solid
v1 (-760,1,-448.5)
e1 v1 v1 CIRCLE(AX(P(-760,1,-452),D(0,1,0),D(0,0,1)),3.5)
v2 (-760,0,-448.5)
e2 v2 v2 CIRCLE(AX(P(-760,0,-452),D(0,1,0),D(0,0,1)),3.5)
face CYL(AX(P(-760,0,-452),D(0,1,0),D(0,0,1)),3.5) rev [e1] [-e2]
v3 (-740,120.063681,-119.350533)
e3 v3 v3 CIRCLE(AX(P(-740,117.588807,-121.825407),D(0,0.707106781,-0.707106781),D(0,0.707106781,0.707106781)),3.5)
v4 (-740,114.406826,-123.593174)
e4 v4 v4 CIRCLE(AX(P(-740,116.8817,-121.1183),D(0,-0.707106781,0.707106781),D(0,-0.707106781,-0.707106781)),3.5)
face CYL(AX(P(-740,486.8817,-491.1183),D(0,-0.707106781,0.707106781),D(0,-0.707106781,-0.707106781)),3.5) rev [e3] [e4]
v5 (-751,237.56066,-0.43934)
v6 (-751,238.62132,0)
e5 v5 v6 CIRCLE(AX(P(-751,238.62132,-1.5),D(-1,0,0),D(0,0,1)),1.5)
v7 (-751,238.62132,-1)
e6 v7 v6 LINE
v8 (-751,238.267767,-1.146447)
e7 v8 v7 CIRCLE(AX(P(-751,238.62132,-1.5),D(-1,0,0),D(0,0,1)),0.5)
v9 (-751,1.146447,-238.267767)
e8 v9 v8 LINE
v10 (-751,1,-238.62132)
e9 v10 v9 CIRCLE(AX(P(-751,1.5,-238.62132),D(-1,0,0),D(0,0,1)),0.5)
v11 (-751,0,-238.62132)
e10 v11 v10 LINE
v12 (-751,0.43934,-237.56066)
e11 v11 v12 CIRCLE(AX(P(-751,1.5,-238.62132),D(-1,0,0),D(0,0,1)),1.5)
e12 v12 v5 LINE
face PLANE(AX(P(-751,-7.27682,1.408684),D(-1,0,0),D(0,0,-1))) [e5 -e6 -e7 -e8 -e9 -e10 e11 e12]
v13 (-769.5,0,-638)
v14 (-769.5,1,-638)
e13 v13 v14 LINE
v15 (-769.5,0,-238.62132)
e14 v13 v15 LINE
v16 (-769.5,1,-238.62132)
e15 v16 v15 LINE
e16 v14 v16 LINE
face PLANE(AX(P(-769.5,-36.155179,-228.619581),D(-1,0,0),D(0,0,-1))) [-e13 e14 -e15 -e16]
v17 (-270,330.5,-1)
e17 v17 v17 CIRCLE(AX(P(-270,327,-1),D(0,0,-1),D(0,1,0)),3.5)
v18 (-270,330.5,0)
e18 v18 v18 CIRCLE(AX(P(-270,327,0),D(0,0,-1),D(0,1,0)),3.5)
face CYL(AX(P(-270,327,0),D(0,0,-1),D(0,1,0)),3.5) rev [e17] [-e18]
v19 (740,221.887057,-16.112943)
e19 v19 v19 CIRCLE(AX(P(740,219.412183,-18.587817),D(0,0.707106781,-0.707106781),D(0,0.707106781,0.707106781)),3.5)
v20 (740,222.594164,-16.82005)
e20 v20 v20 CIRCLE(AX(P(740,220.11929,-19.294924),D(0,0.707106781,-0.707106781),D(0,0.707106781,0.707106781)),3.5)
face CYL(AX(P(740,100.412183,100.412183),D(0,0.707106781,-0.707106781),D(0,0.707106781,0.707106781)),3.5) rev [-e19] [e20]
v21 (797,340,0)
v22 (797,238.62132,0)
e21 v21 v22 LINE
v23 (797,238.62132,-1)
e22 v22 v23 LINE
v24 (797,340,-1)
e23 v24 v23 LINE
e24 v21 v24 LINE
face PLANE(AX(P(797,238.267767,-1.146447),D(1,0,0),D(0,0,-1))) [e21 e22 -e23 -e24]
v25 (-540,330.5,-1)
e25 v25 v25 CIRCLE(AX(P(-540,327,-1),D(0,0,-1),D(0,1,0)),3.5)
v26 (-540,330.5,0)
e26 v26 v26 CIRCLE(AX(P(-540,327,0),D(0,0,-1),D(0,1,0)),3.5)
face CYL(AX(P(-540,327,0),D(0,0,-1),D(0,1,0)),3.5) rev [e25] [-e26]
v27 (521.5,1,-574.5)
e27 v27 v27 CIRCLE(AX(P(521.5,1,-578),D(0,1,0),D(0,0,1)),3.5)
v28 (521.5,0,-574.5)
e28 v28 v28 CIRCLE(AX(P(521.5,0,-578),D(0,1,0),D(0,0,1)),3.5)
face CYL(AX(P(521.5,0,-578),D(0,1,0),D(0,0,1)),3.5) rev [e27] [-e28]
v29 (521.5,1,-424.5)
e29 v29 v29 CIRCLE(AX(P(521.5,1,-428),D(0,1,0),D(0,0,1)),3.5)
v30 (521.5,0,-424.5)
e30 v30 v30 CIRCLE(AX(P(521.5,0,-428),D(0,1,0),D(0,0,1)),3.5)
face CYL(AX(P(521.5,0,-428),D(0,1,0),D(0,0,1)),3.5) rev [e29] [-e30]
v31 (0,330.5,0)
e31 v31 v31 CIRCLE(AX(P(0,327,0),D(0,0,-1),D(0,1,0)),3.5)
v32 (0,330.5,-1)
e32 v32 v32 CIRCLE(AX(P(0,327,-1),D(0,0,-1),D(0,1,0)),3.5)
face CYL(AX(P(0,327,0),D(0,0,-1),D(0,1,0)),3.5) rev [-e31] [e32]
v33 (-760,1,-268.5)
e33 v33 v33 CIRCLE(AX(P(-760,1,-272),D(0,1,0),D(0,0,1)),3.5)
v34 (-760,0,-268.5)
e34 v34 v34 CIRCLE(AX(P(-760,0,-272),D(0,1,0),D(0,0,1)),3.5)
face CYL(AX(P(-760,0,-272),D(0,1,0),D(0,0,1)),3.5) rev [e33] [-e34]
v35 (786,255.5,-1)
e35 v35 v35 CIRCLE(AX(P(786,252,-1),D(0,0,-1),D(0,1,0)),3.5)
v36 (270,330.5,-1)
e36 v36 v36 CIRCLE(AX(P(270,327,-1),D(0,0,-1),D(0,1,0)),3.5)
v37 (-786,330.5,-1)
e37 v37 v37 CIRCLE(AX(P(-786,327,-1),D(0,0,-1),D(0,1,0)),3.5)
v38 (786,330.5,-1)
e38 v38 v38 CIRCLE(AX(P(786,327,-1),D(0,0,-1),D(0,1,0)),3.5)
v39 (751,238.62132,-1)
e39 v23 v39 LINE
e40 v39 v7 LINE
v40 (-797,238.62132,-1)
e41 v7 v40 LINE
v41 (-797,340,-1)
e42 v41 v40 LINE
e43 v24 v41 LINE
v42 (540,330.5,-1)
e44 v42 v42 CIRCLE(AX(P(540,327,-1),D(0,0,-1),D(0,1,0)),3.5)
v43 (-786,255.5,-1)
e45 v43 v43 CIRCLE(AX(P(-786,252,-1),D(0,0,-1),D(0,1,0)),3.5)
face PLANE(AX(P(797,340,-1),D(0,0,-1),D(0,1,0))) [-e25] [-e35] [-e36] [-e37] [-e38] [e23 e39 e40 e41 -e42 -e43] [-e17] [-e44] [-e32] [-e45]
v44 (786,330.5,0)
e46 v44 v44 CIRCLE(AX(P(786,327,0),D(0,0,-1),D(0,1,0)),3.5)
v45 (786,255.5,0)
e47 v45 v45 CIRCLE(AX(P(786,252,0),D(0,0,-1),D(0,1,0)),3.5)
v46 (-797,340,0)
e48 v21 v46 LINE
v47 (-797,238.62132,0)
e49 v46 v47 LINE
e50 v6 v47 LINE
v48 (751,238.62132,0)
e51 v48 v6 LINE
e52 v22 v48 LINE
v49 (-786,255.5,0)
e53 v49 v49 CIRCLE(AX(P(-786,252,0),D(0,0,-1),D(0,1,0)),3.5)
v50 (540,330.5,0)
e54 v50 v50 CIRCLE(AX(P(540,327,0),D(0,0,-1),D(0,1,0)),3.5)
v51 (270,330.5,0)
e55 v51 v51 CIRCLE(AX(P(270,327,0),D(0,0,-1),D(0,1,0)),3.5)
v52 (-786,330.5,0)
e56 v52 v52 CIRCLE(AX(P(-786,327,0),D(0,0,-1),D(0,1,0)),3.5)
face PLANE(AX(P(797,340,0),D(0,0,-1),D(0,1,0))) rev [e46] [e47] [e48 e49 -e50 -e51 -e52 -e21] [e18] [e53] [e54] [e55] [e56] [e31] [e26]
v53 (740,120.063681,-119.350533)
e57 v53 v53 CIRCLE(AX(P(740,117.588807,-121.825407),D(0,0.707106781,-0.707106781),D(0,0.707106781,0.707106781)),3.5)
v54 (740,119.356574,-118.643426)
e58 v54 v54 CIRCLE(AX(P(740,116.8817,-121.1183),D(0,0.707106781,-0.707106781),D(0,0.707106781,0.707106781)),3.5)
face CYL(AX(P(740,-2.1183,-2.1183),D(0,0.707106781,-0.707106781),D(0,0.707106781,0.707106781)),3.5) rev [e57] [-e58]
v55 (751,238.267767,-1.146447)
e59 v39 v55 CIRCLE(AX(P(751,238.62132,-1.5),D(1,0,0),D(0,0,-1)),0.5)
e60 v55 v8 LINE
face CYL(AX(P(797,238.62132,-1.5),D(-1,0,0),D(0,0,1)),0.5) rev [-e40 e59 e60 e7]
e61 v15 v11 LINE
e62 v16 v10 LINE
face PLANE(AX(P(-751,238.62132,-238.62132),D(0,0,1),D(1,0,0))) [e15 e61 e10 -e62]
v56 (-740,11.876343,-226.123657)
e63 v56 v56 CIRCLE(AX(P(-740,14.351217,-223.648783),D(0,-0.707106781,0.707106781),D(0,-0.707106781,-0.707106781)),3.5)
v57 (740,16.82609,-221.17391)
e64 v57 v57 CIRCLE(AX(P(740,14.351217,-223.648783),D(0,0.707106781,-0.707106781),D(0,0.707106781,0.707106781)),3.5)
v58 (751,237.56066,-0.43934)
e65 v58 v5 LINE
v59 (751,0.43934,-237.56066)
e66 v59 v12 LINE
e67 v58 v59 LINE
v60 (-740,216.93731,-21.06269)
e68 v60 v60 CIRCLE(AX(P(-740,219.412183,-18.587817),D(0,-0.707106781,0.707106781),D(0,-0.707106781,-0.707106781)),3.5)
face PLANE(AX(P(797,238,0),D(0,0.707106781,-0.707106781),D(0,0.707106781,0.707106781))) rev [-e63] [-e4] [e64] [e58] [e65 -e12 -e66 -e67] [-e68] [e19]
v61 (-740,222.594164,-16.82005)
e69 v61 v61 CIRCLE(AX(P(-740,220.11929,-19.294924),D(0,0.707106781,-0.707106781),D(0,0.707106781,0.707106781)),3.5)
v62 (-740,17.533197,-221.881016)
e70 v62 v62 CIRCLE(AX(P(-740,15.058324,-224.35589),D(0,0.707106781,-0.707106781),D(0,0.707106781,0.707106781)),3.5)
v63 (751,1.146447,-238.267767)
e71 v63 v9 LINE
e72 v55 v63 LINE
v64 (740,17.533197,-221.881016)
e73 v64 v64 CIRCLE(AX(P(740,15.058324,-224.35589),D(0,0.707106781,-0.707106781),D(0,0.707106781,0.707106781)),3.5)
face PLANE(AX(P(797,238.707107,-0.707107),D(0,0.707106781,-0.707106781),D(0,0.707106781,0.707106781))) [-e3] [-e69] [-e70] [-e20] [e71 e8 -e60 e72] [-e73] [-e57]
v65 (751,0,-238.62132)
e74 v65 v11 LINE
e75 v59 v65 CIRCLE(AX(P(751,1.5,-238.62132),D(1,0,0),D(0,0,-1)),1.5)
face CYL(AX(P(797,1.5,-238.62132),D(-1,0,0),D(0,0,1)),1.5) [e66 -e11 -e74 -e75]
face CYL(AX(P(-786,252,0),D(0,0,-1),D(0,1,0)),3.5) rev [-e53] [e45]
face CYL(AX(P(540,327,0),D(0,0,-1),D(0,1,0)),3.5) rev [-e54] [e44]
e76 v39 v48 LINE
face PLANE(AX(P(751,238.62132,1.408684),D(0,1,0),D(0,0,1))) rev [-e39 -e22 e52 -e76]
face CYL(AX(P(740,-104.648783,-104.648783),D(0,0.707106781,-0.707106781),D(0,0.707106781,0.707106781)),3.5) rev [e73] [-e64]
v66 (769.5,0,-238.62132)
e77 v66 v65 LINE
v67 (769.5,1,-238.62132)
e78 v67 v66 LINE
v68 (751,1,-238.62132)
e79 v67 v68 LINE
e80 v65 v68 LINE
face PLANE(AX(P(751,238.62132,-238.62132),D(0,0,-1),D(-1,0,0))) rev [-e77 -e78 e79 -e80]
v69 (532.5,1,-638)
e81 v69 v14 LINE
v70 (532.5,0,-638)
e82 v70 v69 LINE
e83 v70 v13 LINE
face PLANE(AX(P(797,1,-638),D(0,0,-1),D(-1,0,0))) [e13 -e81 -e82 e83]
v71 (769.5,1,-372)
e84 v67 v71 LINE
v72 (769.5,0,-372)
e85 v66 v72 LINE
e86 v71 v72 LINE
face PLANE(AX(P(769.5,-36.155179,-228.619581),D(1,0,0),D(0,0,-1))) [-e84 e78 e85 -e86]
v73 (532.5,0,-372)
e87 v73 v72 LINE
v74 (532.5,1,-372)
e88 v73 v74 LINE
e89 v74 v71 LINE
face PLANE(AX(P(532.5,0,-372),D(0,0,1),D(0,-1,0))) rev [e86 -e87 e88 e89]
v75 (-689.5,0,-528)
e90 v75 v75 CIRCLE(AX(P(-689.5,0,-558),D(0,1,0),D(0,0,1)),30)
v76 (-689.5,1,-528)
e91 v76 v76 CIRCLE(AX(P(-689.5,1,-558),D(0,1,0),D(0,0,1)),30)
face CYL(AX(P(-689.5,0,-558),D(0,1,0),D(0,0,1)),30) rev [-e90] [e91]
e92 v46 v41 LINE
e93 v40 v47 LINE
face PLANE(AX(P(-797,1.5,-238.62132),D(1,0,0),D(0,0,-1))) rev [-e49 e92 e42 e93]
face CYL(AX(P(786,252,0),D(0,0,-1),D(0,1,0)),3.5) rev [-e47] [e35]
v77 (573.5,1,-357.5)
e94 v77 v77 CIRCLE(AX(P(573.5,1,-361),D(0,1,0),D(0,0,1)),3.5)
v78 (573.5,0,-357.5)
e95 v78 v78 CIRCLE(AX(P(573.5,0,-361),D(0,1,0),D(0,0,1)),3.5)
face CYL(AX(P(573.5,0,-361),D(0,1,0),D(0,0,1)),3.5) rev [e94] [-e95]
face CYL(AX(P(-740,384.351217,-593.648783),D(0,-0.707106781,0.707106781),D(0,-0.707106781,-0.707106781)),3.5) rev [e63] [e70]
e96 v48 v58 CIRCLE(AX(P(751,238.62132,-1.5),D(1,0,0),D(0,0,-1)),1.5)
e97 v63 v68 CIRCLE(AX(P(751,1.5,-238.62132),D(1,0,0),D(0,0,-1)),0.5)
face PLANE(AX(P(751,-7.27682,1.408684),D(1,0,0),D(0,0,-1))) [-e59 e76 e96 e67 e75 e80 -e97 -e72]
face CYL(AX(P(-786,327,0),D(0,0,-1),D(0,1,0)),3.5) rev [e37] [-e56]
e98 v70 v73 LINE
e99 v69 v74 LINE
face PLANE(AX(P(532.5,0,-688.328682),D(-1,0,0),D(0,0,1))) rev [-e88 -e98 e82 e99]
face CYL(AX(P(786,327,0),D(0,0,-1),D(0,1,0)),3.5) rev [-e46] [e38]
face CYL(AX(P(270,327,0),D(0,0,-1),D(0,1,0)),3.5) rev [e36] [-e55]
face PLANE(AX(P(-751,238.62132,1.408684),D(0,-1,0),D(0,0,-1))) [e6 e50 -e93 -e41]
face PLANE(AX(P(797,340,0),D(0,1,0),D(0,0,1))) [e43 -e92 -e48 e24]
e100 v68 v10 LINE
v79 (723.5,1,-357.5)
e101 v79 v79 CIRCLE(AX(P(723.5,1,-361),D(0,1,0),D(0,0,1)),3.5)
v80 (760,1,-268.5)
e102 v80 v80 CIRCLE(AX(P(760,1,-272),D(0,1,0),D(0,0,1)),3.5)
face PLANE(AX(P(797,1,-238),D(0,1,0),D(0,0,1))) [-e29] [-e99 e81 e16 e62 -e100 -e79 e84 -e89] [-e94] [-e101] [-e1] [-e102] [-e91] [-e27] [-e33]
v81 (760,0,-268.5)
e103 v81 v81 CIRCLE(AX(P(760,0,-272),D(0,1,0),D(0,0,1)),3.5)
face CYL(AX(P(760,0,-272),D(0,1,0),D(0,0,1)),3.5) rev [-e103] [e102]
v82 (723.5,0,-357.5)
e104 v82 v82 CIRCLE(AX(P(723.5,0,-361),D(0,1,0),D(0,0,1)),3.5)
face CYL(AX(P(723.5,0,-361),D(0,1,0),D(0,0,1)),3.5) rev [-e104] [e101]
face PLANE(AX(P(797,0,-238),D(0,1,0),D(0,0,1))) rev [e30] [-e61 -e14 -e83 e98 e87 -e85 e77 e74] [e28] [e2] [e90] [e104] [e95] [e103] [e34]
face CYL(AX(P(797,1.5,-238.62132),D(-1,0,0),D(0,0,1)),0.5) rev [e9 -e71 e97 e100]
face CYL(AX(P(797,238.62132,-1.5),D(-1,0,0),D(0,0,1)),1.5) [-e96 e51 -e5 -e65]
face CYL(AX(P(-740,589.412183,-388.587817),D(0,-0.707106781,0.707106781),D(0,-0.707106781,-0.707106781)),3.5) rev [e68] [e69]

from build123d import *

# Parameters (mm, degrees)
SM_BASE_FLANGE_1_DEPTH = 797
SKETCH_3_W             = 240.030004828
SKETCH_3_H             = 245.89814066
CUT_EXTRUDE_1_DEPTH    = 46
SKETCH_4_W             = 434.416474362
SKETCH_4_H             = 72.764759455
CUT_EXTRUDE_2_DEPTH    = 27.5
SKETCH_6_W             = 323.282059801
SKETCH_6_H             = 316.328682171
CUT_EXTRUDE_3_DEPTH    = 1076.72022385
SKETCH_7_R             = 3.5
CUT_EXTRUDE_4_DEPTH    = 1076.443164468
SKETCH_8_R             = 3.5
CUT_EXTRUDE_5_DEPTH    = 1076.72022385
SKETCH_10_R            = 3.5
CUT_EXTRUDE_6_DEPTH    = 976.892146686
SKETCH_11_R            = 3.5
CUT_EXTRUDE_7_DEPTH    = 977.427672693
SKETCH_12_R            = 30
CUT_EXTRUDE_8_DEPTH    = 1076.72022385


# Sheet-metal steps are written as plain solids
with BuildPart() as part:
    # Sketch 1 → 基体-法兰1 (new, symmetric)
    with BuildSketch(Plane(origin=(0, 0, 0), x_dir=(0, 0, -1), z_dir=(1, 0, 0))):
        with BuildLine():
            Line((0, 340), (0, 238.621320344))
            ThreePointArc((0, 238.621320344), (0.114180701, 238.047295195), (0.439339828, 237.560660172))
            Line((0.439339828, 237.560660172), (237.560660172, 0.439339828))
            ThreePointArc((237.560660172, 0.439339828), (238.047295195, 0.114180701), (238.621320344, 0))
            Line((238.621320344, 0), (638, 0))
            Line((638, 0), (638, 1))
            Line((638, 1), (238.621320344, 1))
            ThreePointArc((238.621320344, 1), (238.429978627, 1.038060234), (238.267766953, 1.146446609))
            Line((238.267766953, 1.146446609), (1.146446609, 238.267766953))
            ThreePointArc((1.146446609, 238.267766953), (1.038060234, 238.429978627), (1, 238.621320344))
            Line((1, 238.621320344), (1, 340))
            Line((1, 340), (0, 340))
        make_face()
    extrude(amount=SM_BASE_FLANGE_1_DEPTH, both=True)

    # 草图3 → 切除-拉伸1 (cut)
    with BuildSketch(Plane(origin=(797, 0, 0), x_dir=(0, 0, -1), z_dir=(1, 0, 0))):
        with Locations((118.60631793, 115.672250014)):
            Rectangle(SKETCH_3_W, SKETCH_3_H)
    cut_extrude_1 = extrude(amount=-CUT_EXTRUDE_1_DEPTH, mode=Mode.SUBTRACT)

    # 草图4 → 切除-拉伸2 (cut)
    with BuildSketch(Plane(origin=(797, 0, 0), x_dir=(0, 0, -1), z_dir=(1, 0, 0))):
        with Locations((445.827818623, 0.227200405)):
            Rectangle(SKETCH_4_W, SKETCH_4_H)
    cut_extrude_2 = extrude(amount=-CUT_EXTRUDE_2_DEPTH, mode=Mode.SUBTRACT)

    # 镜向2: 切除-拉伸1, 切除-拉伸2 across plane
    add(cut_extrude_1.mirror(Plane(origin=(0, 0, 0), x_dir=(0, 0, 1), z_dir=(1, 0, 0))), mode=Mode.SUBTRACT)
    add(cut_extrude_2.mirror(Plane(origin=(0, 0, 0), x_dir=(0, 0, 1), z_dir=(1, 0, 0))), mode=Mode.SUBTRACT)

    # 草图6 → 切除-拉伸3 (cut, through all)
    with BuildSketch(Plane(origin=(0, 1, 0), x_dir=(1, 0, 0), z_dir=(0, 1, 0))):
        with Locations((694.141029901, 530.164341086)):
            Rectangle(SKETCH_6_W, SKETCH_6_H)
    extrude(amount=-CUT_EXTRUDE_3_DEPTH, mode=Mode.SUBTRACT)

    # 草图7 → 切除-拉伸4 (cut, through all)
    with BuildSketch(Plane(origin=(0, 0, -1), x_dir=(-1, 0, 0), z_dir=(0, 0, -1))):
        with Locations(Location((0, 327, 0), (0, 0, 90))):
            Circle(SKETCH_7_R)
        with Locations(Location((270, 327, 0), (0, 0, 90))):
            Circle(SKETCH_7_R)
        with Locations(Location((540, 327, 0), (0, 0, 90))):
            Circle(SKETCH_7_R)
        with Locations(Location((786, 327, 0), (0, 0, 90))):
            Circle(SKETCH_7_R)
        with Locations(Location((786, 252, 0), (0, 0, 90))):
            Circle(SKETCH_7_R)
        with Locations(Location((-270, 327, 0), (0, 0, 90))):
            Circle(SKETCH_7_R)
        with Locations(Location((-540, 327, 0), (0, 0, 90))):
            Circle(SKETCH_7_R)
        with Locations(Location((-786, 327, 0), (0, 0, 90))):
            Circle(SKETCH_7_R)
        with Locations(Location((-786, 252, 0), (0, 0, 90))):
            Circle(SKETCH_7_R)
    extrude(amount=-CUT_EXTRUDE_4_DEPTH, mode=Mode.SUBTRACT)

    # 草图8 → 切除-拉伸5 (cut, through all)
    with BuildSketch(Plane(origin=(0, 1, 0), x_dir=(1, 0, 0), z_dir=(0, 1, 0))):
        with Locations(Location((-760, 452, 0), (0, 0, 270))):
            Circle(SKETCH_8_R)
        with Locations(Location((-760, 272, 0), (0, 0, 270))):
            Circle(SKETCH_8_R)
        with Locations(Location((521.5, 578, 0), (0, 0, 270))):
            Circle(SKETCH_8_R)
        with Locations(Location((521.5, 428, 0), (0, 0, 270))):
            Circle(SKETCH_8_R)
        with Locations(Location((573.5, 361, 0), (0, 0, 270))):
            Circle(SKETCH_8_R)
        with Locations(Location((723.5, 361, 0), (0, 0, 270))):
            Circle(SKETCH_8_R)
        with Locations(Location((760, 272, 0), (0, 0, 270))):
            Circle(SKETCH_8_R)
    extrude(amount=-CUT_EXTRUDE_5_DEPTH, mode=Mode.SUBTRACT)

    # 草图10 → 切除-拉伸6 (cut, through all)
    with BuildSketch(Plane(origin=(0, 119.707106781, -119.707106781), x_dir=(1, 0, 0), z_dir=(0, 0.7071067811865477, -0.7071067811865475))):
        with Locations(Location((740, 2.995728589, 0), (0, 0, 270))):
            Circle(SKETCH_10_R)
        with Locations(Location((740, -142.004271411, 0), (0, 0, 270))):
            Circle(SKETCH_10_R)
        with Locations(Location((740, 147.995728589, 0), (0, 0, 270))):
            Circle(SKETCH_10_R)
    extrude(amount=-CUT_EXTRUDE_6_DEPTH, mode=Mode.SUBTRACT)

    # 草图11 → 切除-拉伸7 (cut, through all)
    with BuildSketch(Plane(origin=(0, 119, -119), x_dir=(1, 0, 0), z_dir=(0, -0.7071067811865477, 0.7071067811865475))):
        with Locations(Location((-740, 142.004271411, 0), (0, 0, 270))):
            Circle(SKETCH_11_R)
        with Locations(Location((-740, -2.995728589, 0), (0, 0, 270))):
            Circle(SKETCH_11_R)
        with Locations(Location((-740, -147.995728589, 0), (0, 0, 270))):
            Circle(SKETCH_11_R)
    extrude(amount=-CUT_EXTRUDE_7_DEPTH, mode=Mode.SUBTRACT)

    # 草图12 → 切除-拉伸8 (cut, through all)
    with BuildSketch(Plane(origin=(0, 1, 0), x_dir=(-1, 0, 0), z_dir=(0, 1, 0))):
        with Locations(Location((689.5, -558, 0), (0, 0, 90))):
            Circle(SKETCH_12_R)
    extrude(amount=-CUT_EXTRUDE_8_DEPTH, mode=Mode.SUBTRACT)


solid = part.part
